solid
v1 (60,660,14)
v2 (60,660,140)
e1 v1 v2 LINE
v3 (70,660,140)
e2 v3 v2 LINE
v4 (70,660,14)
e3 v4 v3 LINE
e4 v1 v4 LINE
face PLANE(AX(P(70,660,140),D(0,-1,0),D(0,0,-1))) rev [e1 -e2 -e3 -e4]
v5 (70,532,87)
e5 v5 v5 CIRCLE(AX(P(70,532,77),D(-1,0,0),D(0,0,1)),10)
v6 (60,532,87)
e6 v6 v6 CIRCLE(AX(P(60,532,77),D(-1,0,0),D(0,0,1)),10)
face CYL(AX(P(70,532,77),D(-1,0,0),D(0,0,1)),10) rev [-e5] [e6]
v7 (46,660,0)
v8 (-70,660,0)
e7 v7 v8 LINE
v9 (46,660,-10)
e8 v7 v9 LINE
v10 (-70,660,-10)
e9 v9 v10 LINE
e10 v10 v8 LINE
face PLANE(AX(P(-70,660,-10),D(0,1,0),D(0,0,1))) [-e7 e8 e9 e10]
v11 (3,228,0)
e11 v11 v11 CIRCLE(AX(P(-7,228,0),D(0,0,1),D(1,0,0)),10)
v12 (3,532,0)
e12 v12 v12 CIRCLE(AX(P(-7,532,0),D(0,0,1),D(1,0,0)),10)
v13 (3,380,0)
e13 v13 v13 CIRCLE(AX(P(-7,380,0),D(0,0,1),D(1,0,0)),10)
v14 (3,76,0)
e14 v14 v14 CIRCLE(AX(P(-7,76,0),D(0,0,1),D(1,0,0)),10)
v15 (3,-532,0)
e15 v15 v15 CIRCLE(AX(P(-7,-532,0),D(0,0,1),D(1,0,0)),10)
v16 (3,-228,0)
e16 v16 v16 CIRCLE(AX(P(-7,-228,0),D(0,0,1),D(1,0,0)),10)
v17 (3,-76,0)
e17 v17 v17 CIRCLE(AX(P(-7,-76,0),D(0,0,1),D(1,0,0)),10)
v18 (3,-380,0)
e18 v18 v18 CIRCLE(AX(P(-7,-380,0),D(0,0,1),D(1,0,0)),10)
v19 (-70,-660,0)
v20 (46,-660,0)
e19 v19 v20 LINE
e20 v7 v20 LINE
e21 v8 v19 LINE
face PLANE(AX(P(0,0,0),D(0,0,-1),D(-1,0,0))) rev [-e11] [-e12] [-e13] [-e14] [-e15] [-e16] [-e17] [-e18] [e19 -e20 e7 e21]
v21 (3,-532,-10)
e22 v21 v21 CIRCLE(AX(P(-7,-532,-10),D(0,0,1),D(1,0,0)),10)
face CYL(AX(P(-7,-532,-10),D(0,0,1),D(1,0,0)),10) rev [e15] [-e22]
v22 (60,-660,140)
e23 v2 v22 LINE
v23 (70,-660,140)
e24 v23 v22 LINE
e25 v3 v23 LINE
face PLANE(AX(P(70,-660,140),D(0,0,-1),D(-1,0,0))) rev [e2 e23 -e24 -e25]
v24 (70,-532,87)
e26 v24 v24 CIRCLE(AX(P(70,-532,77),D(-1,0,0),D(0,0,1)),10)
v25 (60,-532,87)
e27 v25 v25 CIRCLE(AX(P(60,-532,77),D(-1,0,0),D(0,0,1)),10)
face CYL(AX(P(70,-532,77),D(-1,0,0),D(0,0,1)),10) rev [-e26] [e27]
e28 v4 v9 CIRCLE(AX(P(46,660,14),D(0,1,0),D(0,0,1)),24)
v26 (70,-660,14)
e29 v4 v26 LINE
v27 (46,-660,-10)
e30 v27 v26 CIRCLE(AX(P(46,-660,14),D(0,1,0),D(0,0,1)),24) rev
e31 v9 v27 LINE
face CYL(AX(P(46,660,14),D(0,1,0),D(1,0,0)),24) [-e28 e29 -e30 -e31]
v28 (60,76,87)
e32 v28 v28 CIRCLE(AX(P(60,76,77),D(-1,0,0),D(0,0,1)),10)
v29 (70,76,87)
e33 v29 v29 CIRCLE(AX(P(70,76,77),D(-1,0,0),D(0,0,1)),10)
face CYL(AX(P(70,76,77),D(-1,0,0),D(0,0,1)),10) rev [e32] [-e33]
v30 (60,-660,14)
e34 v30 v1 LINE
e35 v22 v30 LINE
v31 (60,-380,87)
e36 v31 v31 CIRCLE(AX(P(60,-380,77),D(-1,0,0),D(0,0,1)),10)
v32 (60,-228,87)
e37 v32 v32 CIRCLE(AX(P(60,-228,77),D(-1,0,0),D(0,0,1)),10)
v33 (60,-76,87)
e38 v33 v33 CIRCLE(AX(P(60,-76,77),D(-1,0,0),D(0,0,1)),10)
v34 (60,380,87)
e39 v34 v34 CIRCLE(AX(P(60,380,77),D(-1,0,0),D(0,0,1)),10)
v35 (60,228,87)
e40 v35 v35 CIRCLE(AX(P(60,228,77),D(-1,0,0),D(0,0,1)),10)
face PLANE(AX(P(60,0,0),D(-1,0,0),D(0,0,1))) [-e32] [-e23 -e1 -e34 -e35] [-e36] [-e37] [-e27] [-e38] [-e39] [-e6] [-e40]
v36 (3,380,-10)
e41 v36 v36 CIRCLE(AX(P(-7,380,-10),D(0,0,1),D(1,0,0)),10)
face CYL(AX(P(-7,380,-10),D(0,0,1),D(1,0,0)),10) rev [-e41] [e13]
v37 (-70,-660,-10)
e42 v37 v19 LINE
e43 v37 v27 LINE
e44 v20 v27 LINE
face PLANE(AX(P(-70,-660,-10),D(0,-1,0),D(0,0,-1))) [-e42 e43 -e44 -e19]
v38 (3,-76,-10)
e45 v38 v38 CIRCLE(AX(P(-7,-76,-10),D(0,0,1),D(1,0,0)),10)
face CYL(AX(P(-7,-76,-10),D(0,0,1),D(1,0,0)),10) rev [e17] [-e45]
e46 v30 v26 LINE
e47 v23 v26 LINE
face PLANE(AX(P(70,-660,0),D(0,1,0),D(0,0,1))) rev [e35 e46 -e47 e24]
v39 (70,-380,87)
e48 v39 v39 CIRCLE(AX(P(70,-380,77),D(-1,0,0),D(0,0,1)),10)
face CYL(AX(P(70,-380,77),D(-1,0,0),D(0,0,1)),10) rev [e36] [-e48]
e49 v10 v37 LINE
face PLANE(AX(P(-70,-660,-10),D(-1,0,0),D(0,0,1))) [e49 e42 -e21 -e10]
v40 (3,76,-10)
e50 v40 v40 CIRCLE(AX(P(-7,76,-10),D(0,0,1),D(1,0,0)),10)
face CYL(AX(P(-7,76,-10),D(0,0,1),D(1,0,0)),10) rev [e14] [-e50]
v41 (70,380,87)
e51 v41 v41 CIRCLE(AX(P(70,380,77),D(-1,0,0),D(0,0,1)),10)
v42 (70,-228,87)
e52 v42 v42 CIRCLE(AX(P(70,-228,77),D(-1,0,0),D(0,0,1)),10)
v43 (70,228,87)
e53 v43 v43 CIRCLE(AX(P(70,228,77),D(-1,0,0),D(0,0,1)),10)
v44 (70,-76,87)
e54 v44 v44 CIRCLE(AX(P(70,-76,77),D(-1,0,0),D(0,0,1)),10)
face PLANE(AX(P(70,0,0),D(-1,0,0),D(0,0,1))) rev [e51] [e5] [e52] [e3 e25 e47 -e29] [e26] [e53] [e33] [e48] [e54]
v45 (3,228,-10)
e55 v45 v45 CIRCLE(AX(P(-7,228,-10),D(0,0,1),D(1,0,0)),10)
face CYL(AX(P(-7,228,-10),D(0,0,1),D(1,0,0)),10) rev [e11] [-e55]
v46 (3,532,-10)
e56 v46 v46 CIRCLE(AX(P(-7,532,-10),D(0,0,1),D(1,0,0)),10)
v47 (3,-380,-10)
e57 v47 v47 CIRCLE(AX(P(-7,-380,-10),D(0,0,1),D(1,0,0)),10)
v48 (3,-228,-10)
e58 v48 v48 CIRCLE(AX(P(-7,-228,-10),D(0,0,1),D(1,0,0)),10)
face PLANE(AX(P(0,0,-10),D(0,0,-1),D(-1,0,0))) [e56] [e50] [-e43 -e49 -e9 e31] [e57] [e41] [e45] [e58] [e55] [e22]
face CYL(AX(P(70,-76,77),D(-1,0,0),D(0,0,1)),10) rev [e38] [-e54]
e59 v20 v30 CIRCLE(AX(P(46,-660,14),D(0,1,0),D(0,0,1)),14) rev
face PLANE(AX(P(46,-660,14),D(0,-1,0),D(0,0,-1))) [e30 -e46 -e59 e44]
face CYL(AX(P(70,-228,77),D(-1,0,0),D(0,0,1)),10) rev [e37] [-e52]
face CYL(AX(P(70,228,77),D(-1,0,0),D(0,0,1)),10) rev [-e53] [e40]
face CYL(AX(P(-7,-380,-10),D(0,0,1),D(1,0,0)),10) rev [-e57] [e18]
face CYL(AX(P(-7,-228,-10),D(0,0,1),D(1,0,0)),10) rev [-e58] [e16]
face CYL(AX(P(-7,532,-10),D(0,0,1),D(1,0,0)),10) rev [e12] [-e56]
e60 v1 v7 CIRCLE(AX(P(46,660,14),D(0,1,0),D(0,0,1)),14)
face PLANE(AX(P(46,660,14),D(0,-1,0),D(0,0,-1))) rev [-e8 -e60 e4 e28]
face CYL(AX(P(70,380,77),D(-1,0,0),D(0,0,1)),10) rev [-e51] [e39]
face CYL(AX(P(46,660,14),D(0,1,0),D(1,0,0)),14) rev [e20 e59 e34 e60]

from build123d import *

# Parameters (mm, degrees)
SKETCH1_W                    = 140
SKETCH1_H                    = 1320
BASE_FLANGE1_DEPTH           = 10
EDGE_FLANGE1_STRIP_W         = 68
EDGE_FLANGE1_STRIP_H         = 10
EDGE_FLANGE1_STRIP_CUT_DEPTH = 1320
EDGE_FLANGE1_DEPTH           = 1320
SKETCH12_R                   = 10
CUT_EXTRUDE1_DEPTH           = 10
SKETCH13_R                   = 10
CUT_EXTRUDE2_DEPTH           = 10
LPATTERN1_COUNT              = 8
LPATTERN1_PITCH              = 152


# Sheet-metal steps are written as plain solids
with BuildPart() as part:
    # Sketch1 → Base-Flange1 (new body)
    with BuildSketch(Plane.XY):
        Rectangle(SKETCH1_W, SKETCH1_H)
    extrude(amount=-BASE_FLANGE1_DEPTH)

    # Edge-Flange1 strip (across the edge) → Edge-Flange1 strip cut (cut)
    with BuildSketch(Plane(origin=(70, -660, 0), x_dir=(-1, 0, 0), z_dir=(0, 1, 0))):
        with Locations((-10, -5)):
            Rectangle(EDGE_FLANGE1_STRIP_W, EDGE_FLANGE1_STRIP_H)
    extrude(amount=EDGE_FLANGE1_STRIP_CUT_DEPTH, mode=Mode.SUBTRACT)

    # Edge-Flange1 section (across the edge) → Edge-Flange1 (add)
    with BuildSketch(Plane(origin=(70, -660, 0), x_dir=(-1, 0, 0), z_dir=(0, 1, 0))):
        with BuildLine():
            Line((0, 14), (0, 140))
            Line((0, 140), (10, 140))
            Line((10, 140), (10, 14))
            ThreePointArc((10, 14), (14.100505063, 4.100505063), (24, 0))
            Line((24, 0), (24, -10))
            ThreePointArc((24, -10), (7.029437252, -2.970562748), (0, 14))
        make_face()
    extrude(amount=EDGE_FLANGE1_DEPTH)

    # Sketch12 → Cut-Extrude1 (cut)
    with BuildSketch(Plane.ZY.offset(-60)):
        with Locations((77, 532)):
            Circle(SKETCH12_R)
    cut_extrude1 = extrude(amount=-CUT_EXTRUDE1_DEPTH, mode=Mode.SUBTRACT)

    # Sketch13 → Cut-Extrude2 (cut)
    with BuildSketch(Plane.XY):
        with Locations((-7, 532)):
            Circle(SKETCH13_R)
    cut_extrude2 = extrude(amount=-CUT_EXTRUDE2_DEPTH, mode=Mode.SUBTRACT)

    # LPattern1: Cut-Extrude1, Cut-Extrude2 ×8
    with Locations(*[(0, -i * LPATTERN1_PITCH, 0) for i in range(1, LPATTERN1_COUNT)]):
        add(cut_extrude1, mode=Mode.SUBTRACT)
        add(cut_extrude2, mode=Mode.SUBTRACT)


solid = part.part
